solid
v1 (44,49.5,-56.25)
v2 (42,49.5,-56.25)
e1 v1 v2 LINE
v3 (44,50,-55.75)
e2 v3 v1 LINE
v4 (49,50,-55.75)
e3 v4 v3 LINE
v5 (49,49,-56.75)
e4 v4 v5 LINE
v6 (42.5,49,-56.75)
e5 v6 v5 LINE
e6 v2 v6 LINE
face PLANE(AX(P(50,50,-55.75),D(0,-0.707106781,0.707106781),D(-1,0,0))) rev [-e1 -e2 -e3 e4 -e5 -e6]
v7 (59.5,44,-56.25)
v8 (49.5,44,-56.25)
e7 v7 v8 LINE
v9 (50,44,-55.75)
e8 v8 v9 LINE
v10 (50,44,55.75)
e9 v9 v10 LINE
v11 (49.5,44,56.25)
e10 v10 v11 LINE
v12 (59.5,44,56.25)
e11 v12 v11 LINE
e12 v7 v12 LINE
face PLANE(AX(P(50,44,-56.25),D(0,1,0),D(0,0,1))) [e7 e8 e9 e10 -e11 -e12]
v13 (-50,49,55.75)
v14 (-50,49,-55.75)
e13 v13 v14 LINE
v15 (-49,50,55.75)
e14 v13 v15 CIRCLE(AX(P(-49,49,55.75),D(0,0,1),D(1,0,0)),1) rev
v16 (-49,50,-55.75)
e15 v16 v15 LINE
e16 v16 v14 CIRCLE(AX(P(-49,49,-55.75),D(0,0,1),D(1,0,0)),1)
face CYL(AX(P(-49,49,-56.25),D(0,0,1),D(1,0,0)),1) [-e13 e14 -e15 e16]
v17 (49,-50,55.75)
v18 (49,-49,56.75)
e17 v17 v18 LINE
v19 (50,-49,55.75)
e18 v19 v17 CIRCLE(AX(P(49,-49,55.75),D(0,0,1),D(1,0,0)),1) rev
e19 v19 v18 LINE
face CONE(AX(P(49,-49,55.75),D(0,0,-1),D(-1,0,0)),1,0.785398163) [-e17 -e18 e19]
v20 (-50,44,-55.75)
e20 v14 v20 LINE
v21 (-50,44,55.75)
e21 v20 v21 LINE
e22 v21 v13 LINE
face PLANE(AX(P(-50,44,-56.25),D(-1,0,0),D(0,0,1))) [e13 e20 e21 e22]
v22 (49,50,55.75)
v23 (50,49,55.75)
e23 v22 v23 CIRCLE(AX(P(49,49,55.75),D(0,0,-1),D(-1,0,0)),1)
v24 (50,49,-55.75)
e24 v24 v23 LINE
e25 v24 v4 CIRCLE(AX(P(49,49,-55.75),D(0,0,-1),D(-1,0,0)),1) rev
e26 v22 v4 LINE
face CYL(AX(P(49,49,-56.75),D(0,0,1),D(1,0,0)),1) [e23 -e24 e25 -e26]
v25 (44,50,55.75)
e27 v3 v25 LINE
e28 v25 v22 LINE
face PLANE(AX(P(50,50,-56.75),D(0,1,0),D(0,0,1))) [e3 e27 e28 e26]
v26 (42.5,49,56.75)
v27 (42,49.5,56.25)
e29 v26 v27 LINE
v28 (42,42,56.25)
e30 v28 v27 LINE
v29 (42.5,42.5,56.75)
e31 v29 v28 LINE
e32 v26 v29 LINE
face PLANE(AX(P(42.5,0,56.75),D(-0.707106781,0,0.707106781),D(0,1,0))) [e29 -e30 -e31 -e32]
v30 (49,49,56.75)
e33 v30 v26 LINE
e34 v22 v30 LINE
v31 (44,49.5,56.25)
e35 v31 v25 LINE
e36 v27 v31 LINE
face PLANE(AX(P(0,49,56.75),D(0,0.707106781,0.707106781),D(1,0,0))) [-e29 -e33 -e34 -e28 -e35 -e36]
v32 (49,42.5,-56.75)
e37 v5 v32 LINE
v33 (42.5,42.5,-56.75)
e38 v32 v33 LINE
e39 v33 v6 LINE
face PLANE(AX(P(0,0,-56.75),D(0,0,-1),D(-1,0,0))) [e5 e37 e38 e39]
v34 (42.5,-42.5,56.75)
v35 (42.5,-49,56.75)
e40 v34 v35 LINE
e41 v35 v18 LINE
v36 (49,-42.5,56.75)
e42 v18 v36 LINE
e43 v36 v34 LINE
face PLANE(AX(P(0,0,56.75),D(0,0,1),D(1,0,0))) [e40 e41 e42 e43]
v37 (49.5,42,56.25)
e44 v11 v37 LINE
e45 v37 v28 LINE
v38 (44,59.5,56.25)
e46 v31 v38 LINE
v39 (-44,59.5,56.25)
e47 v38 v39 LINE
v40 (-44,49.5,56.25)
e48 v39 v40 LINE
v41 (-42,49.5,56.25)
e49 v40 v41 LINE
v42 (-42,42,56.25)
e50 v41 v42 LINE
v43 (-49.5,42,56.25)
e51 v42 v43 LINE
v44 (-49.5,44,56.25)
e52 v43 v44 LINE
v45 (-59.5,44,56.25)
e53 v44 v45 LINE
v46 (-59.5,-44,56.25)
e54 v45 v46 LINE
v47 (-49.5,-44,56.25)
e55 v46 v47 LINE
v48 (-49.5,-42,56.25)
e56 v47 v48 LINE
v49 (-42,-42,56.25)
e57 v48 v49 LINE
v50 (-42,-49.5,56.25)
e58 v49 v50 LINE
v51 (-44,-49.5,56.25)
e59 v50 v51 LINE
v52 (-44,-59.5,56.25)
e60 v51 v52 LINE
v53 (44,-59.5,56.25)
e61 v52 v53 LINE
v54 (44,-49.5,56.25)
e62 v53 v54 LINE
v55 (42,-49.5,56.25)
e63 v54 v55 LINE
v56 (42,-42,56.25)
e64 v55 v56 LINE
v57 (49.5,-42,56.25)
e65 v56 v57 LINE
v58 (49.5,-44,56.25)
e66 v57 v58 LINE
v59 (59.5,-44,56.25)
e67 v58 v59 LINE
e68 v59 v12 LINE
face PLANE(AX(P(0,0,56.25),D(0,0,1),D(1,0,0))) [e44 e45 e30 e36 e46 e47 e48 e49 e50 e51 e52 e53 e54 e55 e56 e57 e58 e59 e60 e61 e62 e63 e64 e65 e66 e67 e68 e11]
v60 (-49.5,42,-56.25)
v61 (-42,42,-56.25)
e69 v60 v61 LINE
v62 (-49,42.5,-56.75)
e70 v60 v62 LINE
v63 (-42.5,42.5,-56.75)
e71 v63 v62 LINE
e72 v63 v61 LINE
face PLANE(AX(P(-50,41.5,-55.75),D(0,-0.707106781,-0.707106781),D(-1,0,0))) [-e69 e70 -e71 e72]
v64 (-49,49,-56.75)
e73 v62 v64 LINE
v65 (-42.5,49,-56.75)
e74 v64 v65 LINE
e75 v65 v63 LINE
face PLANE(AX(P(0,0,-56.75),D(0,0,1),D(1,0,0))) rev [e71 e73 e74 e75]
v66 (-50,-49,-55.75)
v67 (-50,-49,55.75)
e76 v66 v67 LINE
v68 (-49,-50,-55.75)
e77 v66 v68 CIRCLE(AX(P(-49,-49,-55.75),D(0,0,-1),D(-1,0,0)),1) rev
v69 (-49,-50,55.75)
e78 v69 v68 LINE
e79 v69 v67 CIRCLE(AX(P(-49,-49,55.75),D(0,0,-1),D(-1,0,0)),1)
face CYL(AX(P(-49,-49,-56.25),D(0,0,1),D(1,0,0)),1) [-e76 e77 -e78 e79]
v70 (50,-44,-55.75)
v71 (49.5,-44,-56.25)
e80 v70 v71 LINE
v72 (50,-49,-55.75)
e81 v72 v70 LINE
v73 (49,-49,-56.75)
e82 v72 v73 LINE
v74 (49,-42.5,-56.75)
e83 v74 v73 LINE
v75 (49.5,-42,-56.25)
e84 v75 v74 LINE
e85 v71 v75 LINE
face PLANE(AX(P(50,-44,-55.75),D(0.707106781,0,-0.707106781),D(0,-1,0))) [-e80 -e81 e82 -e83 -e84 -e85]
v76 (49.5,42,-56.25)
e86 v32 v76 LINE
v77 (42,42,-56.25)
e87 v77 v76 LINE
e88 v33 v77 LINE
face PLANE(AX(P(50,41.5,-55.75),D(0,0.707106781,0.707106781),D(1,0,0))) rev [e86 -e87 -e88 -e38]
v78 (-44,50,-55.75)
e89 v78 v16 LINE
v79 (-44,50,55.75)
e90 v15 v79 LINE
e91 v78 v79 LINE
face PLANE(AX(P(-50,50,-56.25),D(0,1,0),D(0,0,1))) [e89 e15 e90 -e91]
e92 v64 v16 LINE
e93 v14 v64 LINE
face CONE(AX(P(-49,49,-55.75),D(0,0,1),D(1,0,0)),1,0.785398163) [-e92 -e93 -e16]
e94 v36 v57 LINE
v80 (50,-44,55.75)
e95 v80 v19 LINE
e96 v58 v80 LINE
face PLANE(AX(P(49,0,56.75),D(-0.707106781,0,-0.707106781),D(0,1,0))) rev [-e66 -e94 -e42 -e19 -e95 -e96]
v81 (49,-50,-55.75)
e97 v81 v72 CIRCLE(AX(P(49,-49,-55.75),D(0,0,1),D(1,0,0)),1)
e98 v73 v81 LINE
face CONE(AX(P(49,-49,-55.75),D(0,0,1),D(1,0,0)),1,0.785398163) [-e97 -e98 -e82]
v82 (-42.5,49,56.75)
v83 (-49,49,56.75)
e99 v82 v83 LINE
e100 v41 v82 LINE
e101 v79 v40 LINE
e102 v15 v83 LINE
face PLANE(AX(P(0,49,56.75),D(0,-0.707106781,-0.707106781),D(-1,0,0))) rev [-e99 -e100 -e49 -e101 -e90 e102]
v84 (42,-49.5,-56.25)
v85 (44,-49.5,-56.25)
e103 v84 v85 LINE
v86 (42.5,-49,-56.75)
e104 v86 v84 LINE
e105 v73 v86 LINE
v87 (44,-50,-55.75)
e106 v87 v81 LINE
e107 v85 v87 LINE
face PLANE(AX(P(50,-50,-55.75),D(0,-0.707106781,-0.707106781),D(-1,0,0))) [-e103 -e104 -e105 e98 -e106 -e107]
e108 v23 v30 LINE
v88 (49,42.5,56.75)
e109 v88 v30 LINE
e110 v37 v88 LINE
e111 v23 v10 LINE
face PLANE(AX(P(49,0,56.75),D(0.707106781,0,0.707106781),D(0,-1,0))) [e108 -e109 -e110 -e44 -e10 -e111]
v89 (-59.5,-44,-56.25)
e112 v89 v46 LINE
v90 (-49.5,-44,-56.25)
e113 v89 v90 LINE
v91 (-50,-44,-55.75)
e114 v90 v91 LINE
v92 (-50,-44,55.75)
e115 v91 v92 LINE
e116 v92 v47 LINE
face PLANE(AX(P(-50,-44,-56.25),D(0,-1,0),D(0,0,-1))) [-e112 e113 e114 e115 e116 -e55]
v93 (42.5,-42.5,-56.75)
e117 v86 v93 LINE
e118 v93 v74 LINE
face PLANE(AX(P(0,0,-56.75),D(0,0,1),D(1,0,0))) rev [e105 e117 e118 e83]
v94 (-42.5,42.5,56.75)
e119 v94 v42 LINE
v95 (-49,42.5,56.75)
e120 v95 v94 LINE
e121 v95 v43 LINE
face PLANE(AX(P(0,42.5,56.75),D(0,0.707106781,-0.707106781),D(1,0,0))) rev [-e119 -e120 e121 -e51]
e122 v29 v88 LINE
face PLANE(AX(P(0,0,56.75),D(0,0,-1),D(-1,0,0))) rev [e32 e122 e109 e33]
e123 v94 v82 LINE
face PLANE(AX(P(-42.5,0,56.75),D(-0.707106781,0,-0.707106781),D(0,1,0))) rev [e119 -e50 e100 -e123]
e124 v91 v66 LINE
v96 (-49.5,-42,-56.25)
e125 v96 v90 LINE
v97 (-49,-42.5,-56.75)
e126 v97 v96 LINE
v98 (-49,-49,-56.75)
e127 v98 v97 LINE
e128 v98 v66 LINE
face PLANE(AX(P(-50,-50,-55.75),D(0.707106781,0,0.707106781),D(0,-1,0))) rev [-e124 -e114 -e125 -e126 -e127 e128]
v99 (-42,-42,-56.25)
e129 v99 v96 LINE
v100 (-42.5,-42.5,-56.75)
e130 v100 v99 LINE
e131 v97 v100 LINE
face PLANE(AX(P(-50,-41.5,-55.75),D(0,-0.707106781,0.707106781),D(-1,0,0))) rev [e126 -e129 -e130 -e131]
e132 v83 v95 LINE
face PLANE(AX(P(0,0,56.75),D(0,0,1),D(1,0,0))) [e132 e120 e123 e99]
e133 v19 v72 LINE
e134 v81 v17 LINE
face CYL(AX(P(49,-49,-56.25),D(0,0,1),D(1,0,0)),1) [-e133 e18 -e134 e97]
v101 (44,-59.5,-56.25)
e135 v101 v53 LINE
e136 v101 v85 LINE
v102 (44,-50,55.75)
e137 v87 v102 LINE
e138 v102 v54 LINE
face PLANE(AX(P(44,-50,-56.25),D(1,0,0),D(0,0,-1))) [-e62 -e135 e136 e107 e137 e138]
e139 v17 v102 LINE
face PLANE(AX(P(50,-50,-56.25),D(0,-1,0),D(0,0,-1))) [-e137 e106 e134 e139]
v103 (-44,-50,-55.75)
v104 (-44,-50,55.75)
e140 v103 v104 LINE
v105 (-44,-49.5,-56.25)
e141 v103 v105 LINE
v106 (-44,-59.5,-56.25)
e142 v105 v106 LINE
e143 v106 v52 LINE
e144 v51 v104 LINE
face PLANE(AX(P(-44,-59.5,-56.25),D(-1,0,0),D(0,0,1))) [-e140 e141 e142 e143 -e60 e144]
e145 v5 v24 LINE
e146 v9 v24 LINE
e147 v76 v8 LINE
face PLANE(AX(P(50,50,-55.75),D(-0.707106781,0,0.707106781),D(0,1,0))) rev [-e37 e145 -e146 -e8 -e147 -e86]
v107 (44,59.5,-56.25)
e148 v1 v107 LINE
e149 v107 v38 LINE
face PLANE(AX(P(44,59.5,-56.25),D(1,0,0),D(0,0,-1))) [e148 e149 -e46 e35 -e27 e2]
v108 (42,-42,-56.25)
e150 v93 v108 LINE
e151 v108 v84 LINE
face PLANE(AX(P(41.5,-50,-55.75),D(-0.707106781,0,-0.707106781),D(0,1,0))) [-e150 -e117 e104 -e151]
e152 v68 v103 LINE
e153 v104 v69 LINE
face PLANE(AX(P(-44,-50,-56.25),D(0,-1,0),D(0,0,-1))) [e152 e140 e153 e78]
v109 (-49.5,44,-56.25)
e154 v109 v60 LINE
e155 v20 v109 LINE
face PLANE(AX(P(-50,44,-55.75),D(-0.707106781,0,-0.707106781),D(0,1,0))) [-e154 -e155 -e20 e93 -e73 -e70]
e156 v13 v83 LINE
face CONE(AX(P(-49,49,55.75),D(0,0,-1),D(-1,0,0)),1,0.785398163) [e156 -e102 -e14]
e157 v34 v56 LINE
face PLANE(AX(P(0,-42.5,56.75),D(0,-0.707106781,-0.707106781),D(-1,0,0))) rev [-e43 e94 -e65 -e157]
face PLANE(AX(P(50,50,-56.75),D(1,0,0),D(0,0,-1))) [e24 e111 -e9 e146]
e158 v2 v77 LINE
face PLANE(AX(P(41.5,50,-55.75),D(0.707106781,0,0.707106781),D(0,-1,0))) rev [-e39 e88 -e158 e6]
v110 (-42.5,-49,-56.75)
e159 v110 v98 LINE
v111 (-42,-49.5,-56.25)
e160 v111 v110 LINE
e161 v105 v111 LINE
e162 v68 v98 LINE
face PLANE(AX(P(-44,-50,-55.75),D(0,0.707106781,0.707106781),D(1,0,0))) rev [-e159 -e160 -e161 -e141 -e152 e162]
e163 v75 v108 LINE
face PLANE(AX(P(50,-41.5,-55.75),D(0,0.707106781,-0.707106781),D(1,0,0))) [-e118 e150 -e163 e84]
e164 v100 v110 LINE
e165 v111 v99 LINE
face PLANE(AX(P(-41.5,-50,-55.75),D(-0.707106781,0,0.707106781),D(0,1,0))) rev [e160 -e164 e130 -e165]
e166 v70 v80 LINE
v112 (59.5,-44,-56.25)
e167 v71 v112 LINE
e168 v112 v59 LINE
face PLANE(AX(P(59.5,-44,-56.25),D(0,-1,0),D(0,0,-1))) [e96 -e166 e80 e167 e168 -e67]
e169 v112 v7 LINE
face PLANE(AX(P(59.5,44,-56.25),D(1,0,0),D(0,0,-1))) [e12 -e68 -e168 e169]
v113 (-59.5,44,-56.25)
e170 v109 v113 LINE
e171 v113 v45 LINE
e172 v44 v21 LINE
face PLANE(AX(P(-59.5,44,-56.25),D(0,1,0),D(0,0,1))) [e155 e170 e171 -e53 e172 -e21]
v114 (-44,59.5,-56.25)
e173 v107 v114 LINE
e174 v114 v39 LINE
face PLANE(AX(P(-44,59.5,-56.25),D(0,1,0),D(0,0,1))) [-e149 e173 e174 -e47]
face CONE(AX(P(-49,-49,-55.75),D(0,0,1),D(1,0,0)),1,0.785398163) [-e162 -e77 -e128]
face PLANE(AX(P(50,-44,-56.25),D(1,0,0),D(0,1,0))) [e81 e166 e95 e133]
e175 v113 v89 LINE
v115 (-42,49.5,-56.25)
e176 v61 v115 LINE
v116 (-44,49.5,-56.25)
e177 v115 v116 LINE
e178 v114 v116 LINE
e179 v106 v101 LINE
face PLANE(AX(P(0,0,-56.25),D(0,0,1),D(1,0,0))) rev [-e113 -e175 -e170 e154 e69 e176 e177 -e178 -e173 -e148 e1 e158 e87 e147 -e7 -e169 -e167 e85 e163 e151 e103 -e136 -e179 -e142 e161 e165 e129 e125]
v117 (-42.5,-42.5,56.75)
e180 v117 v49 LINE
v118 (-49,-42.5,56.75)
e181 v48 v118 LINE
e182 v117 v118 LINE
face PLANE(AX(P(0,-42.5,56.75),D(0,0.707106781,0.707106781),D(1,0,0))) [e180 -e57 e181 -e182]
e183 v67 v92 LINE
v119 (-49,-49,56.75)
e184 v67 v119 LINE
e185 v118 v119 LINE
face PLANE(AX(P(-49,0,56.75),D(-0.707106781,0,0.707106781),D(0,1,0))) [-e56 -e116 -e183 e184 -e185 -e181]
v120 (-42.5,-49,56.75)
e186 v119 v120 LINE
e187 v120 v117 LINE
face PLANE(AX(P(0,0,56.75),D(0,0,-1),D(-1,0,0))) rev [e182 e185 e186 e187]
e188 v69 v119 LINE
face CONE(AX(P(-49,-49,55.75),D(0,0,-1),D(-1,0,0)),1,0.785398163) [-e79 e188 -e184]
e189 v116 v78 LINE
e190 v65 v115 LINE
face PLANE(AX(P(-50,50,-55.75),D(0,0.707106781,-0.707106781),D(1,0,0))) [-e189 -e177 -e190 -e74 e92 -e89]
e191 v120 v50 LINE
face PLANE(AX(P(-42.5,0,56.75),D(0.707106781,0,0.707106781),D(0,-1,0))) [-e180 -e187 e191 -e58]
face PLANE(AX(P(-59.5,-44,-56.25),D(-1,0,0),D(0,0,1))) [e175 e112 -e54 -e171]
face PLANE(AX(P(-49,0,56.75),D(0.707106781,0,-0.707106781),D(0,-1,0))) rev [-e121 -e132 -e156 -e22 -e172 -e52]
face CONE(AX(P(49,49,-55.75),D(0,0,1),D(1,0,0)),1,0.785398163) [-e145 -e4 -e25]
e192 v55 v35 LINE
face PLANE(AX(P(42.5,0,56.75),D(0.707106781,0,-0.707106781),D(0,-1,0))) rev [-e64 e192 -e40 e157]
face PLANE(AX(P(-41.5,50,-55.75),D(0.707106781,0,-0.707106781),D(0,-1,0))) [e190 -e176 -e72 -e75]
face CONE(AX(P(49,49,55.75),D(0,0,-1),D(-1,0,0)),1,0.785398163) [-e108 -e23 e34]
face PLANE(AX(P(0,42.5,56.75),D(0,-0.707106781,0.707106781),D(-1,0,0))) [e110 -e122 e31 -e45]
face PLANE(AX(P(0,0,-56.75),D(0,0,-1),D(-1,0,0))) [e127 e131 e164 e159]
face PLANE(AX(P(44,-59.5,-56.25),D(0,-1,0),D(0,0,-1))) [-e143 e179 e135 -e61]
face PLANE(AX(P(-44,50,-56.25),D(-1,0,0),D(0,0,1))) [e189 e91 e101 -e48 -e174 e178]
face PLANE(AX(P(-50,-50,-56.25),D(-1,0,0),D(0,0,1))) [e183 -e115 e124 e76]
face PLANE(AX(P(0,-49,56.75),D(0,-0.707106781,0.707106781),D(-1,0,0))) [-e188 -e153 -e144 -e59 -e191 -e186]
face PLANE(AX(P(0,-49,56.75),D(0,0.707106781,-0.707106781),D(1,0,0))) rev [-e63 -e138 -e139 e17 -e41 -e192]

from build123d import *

# Parameters (mm, degrees)
BOSS_EXTRUDE1_DEPTH        = 56.75
BOSS_EXTRUDE1_DEPTH_BACK   = 56.75
SKETCH1_W                  = 8.5
SKETCH1_H                  = 8.5
BOSS_EXTRUDE1_2_DEPTH      = 56.75
BOSS_EXTRUDE1_2_DEPTH_BACK = 56.75
BOSS_EXTRUDE1_3_DEPTH      = 56.75
BOSS_EXTRUDE1_3_DEPTH_BACK = 56.75
BOSS_EXTRUDE1_4_DEPTH      = 56.75
BOSS_EXTRUDE1_4_DEPTH_BACK = 56.75
BOSS_EXTRUDE2_DEPTH        = 56.25
BOSS_EXTRUDE2_DEPTH_BACK   = 56.25
FILLET1_R                  = 1
CHAMFER2_SIZE              = 1


with BuildPart() as part:
    # Sketch1 → Boss-Extrude1 (new, two sides: drawn at the far end of the back side and taken through both)
    with BuildSketch(Plane.XY.offset(-BOSS_EXTRUDE1_DEPTH_BACK)):
        with Locations((-45.75, 45.75)):
            Rectangle(SKETCH1_W, SKETCH1_H)
    extrude(amount=BOSS_EXTRUDE1_DEPTH + BOSS_EXTRUDE1_DEPTH_BACK)



with BuildPart() as body_2:
    # Sketch1 → Boss-Extrude1 2 (new, two sides: drawn at the far end of the back side and taken through both)
    with BuildSketch(Plane.XY.offset(-BOSS_EXTRUDE1_2_DEPTH_BACK)):
        with Locations((45.75, 45.75)):
            Rectangle(SKETCH1_W, SKETCH1_H)
    extrude(amount=BOSS_EXTRUDE1_2_DEPTH + BOSS_EXTRUDE1_2_DEPTH_BACK)


with BuildPart() as body_3:
    # Sketch1 → Boss-Extrude1 3 (new, two sides: drawn at the far end of the back side and taken through both)
    with BuildSketch(Plane.XY.offset(-BOSS_EXTRUDE1_3_DEPTH_BACK)):
        with Locations((45.75, -45.75)):
            Rectangle(SKETCH1_W, SKETCH1_H)
    extrude(amount=BOSS_EXTRUDE1_3_DEPTH + BOSS_EXTRUDE1_3_DEPTH_BACK)


with BuildPart() as body_4:
    # Sketch1 → Boss-Extrude1 4 (new, two sides: drawn at the far end of the back side and taken through both)
    with BuildSketch(Plane.XY.offset(-BOSS_EXTRUDE1_4_DEPTH_BACK)):
        with Locations((-45.75, -45.75)):
            Rectangle(SKETCH1_W, SKETCH1_H)
    extrude(amount=BOSS_EXTRUDE1_4_DEPTH + BOSS_EXTRUDE1_4_DEPTH_BACK)


with BuildPart() as part_1:
    add(part.part)

    add(body_2.part)  # Boss-Extrude2 merges body 2

    add(body_3.part)  # Boss-Extrude2 merges body 3

    add(body_4.part)  # Boss-Extrude2 merges body 4
    # Sketch2 → Boss-Extrude2 (add, two sides: drawn at the far end of the back side and taken through both)
    with BuildSketch(Plane.XY.offset(-BOSS_EXTRUDE2_DEPTH_BACK)):
        Polygon((-44, 50), (-44, 59.5), (44, 59.5), (44, 50), (50, 50), (50, 44), (59.5, 44), (59.5, -44), (50, -44), (50, -50), (44, -50), (44, -59.5), (-44, -59.5), (-44, -50), (-50, -50), (-50, -44), (-59.5, -44), (-59.5, 44), (-50, 44), (-50, 50), align=None)
    extrude(amount=BOSS_EXTRUDE2_DEPTH + BOSS_EXTRUDE2_DEPTH_BACK)

    # Fillet1
    fillet1_edges = [part_1.edges().sort_by_distance(p)[0] for p in [
        (50, -50, 0),
        (-50, -50, 0),
        (-50, 50, 0),
        (50, 50, 0),
    ]]
    fillet(fillet1_edges, radius=FILLET1_R)

    # Chamfer2
    chamfer2_edges = [part_1.edges().sort_by_distance(p)[0] for p in [
        (45.25, -50, 56.75),
        (50, -45.25, 56.75),
        (49.707106781, -49.707106781, 56.75),
    ]]
    chamfer(chamfer2_edges, length=CHAMFER2_SIZE)
    chamfer2_2_edges = [part_1.edges().sort_by_distance(p)[0] for p in [
        (45.25, -50, -56.75),
        (50, -45.25, -56.75),
        (49.707106781, -49.707106781, -56.75),
    ]]
    chamfer(chamfer2_2_edges, length=CHAMFER2_SIZE)
    chamfer2_3_edges = [part_1.edges().sort_by_distance(p)[0] for p in [
        (50, 45.25, 56.75),
        (45.25, 50, 56.75),
        (49.707106781, 49.707106781, 56.75),
    ]]
    chamfer(chamfer2_3_edges, length=CHAMFER2_SIZE)
    chamfer2_4_edges = [part_1.edges().sort_by_distance(p)[0] for p in [
        (50, 45.25, -56.75),
        (45.25, 50, -56.75),
        (49.707106781, 49.707106781, -56.75),
    ]]
    chamfer(chamfer2_4_edges, length=CHAMFER2_SIZE)
    chamfer2_5_edges = [part_1.edges().sort_by_distance(p)[0] for p in [
        (-45.25, 50, 56.75),
        (-49.707106781, 49.707106781, 56.75),
        (-50, 45.25, 56.75),
    ]]
    chamfer(chamfer2_5_edges, length=CHAMFER2_SIZE)
    chamfer2_6_edges = [part_1.edges().sort_by_distance(p)[0] for p in [
        (-45.25, 50, -56.75),
        (-49.707106781, 49.707106781, -56.75),
        (-50, 45.25, -56.75),
    ]]
    chamfer(chamfer2_6_edges, length=CHAMFER2_SIZE)
    chamfer2_7_edges = [part_1.edges().sort_by_distance(p)[0] for p in [
        (-50, -45.25, 56.75),
        (-45.25, -50, 56.75),
        (-49.707106781, -49.707106781, 56.75),
    ]]
    chamfer(chamfer2_7_edges, length=CHAMFER2_SIZE)
    chamfer2_8_edges = [part_1.edges().sort_by_distance(p)[0] for p in [
        (-50, -45.25, -56.75),
        (-45.25, -50, -56.75),
        (-49.707106781, -49.707106781, -56.75),
    ]]
    chamfer(chamfer2_8_edges, length=CHAMFER2_SIZE)
    # the kernel refuses this chamfer: 1 mm, written as the material it takes off along each edge
    with BuildSketch(Plane(origin=(41.5, -51.571682988, 56.75), x_dir=(-0.027495876610589005, 0, -0.9996219169112968), z_dir=(0, 1, 0))) as chamfer2_9_piece_1_section:
        with BuildLine():
            Line((1.028673195, 0), (-0.056547155, -1.027117794))
            Line((-0.056547155, -1.027117794), (-0.076539593, -1.026567876))
            ThreePointArc((-0.076539593, -1.026567876), (-0.034129227, -0.51339783), (-0.019992438, 0.000549918))
            Line((-0.019992438, 0.000549918), (0.000549918, 0.019992438))
            ThreePointArc((0.000549918, 0.019992438), (0.514497665, 0.00585565), (1.029223113, 0.019992438))
            Line((1.029223113, 0.019992438), (1.028673195, 0))
        make_face()
    chamfer2_9_piece_1 = extrude(amount=12.643365976, mode=Mode.PRIVATE)
    chamfer2_9_piece_1 = split(chamfer2_9_piece_1, bisect_by=Plane(origin=(41.893401084, -45.25, 56.25), z_dir=(0, 0, 1)), keep=Keep.TOP, mode=Mode.PRIVATE)
    add(chamfer2_9_piece_1, mode=Mode.SUBTRACT)
    # the kernel refuses this chamfer: 1 mm, written as the material it takes off along each edge
    with BuildSketch(Plane(origin=(41.5, -51.571682988, -56.75), x_dir=(-0.027495876610589005, 0, 0.9996219169112968), z_dir=(0, 1, 0))) as chamfer2_10_piece_1_section:
        with BuildLine():
            Line((1.028673195, 0), (-0.056547155, 1.027117794))
            Line((-0.056547155, 1.027117794), (-0.076539593, 1.026567876))
            ThreePointArc((-0.076539593, 1.026567876), (-0.034129227, 0.51339783), (-0.019992438, -0.000549918))
            Line((-0.019992438, -0.000549918), (0.000549918, -0.019992438))
            ThreePointArc((0.000549918, -0.019992438), (0.514497665, -0.00585565), (1.029223113, -0.019992438))
            Line((1.029223113, -0.019992438), (1.028673195, 0))
        make_face()
    chamfer2_10_piece_1 = extrude(amount=12.643365976, mode=Mode.PRIVATE)
    chamfer2_10_piece_1 = split(chamfer2_10_piece_1, bisect_by=Plane(origin=(41.893401084, -45.25, -56.25), z_dir=(0, 0, -1)), keep=Keep.TOP, mode=Mode.PRIVATE)
    add(chamfer2_10_piece_1, mode=Mode.SUBTRACT)
    # the kernel refuses this chamfer: 1 mm, written as the material it takes off along each edge
    with BuildSketch(Plane(origin=(39.928317012, -41.5, 56.75), x_dir=(0, 0.027495876610589005, -0.9996219169112968), z_dir=(1, 0, 0))) as chamfer2_11_piece_1_section:
        with BuildLine():
            Line((1.028673195, 0), (-0.056547155, -1.027117794))
            Line((-0.056547155, -1.027117794), (-0.076539593, -1.026567876))
            ThreePointArc((-0.076539593, -1.026567876), (-0.034129227, -0.51339783), (-0.019992438, 0.000549918))
            Line((-0.019992438, 0.000549918), (0.000549918, 0.019992438))
            ThreePointArc((0.000549918, 0.019992438), (0.514497665, 0.00585565), (1.029223113, 0.019992438))
            Line((1.029223113, 0.019992438), (1.028673195, 0))
        make_face()
    chamfer2_11_piece_1 = extrude(amount=11.643365976, mode=Mode.PRIVATE)
    chamfer2_11_piece_1 = split(chamfer2_11_piece_1, bisect_by=Plane(origin=(45.75, -41.893401084, 56.25), z_dir=(0, 0, 1)), keep=Keep.TOP, mode=Mode.PRIVATE)
    add(chamfer2_11_piece_1, mode=Mode.SUBTRACT)
    # the kernel refuses this chamfer: 1 mm, written as the material it takes off along each edge
    with BuildSketch(Plane(origin=(39.928317012, -41.5, -56.75), x_dir=(0, 0.027495876610589005, 0.9996219169112968), z_dir=(1, 0, 0))) as chamfer2_12_piece_1_section:
        with BuildLine():
            Line((1.028673195, 0), (-0.056547155, 1.027117794))
            Line((-0.056547155, 1.027117794), (-0.076539593, 1.026567876))
            ThreePointArc((-0.076539593, 1.026567876), (-0.034129227, 0.51339783), (-0.019992438, -0.000549918))
            Line((-0.019992438, -0.000549918), (0.000549918, -0.019992438))
            ThreePointArc((0.000549918, -0.019992438), (0.514497665, -0.00585565), (1.029223113, -0.019992438))
            Line((1.029223113, -0.019992438), (1.028673195, 0))
        make_face()
    chamfer2_12_piece_1 = extrude(amount=11.643365976, mode=Mode.PRIVATE)
    chamfer2_12_piece_1 = split(chamfer2_12_piece_1, bisect_by=Plane(origin=(45.75, -41.893401084, -56.25), z_dir=(0, 0, -1)), keep=Keep.TOP, mode=Mode.PRIVATE)
    add(chamfer2_12_piece_1, mode=Mode.SUBTRACT)
    # the kernel refuses this chamfer: 1 mm, written as the material it takes off along each edge
    with BuildSketch(Plane(origin=(38.928317012, 41.5, 56.75), x_dir=(0, -0.027495876610589005, -0.9996219169112968), z_dir=(1, 0, 0))) as chamfer2_13_piece_1_section:
        with BuildLine():
            Line((1.028673195, 0), (-0.056547155, 1.027117794))
            Line((-0.056547155, 1.027117794), (-0.076539593, 1.026567876))
            ThreePointArc((-0.076539593, 1.026567876), (-0.034129227, 0.51339783), (-0.019992438, -0.000549918))
            Line((-0.019992438, -0.000549918), (0.000549918, -0.019992438))
            ThreePointArc((0.000549918, -0.019992438), (0.514497665, -0.00585565), (1.029223113, -0.019992438))
            Line((1.029223113, -0.019992438), (1.028673195, 0))
        make_face()
    chamfer2_13_piece_1 = extrude(amount=12.643365976, mode=Mode.PRIVATE)
    chamfer2_13_piece_1 = split(chamfer2_13_piece_1, bisect_by=Plane(origin=(45.25, 41.893401084, 56.25), z_dir=(0, 0, 1)), keep=Keep.TOP, mode=Mode.PRIVATE)
    add(chamfer2_13_piece_1, mode=Mode.SUBTRACT)
    # the kernel refuses this chamfer: 1 mm, written as the material it takes off along each edge
    with BuildSketch(Plane(origin=(41.5, 51.571682988, 56.75), x_dir=(-0.027495876610589005, 0, -0.9996219169112968), z_dir=(0, -1, 0))) as chamfer2_14_piece_1_section:
        with BuildLine():
            Line((1.028673195, 0), (-0.056547155, 1.027117794))
            Line((-0.056547155, 1.027117794), (-0.076539593, 1.026567876))
            ThreePointArc((-0.076539593, 1.026567876), (-0.034129227, 0.51339783), (-0.019992438, -0.000549918))
            Line((-0.019992438, -0.000549918), (0.000549918, -0.019992438))
            ThreePointArc((0.000549918, -0.019992438), (0.514497665, -0.00585565), (1.029223113, -0.019992438))
            Line((1.029223113, -0.019992438), (1.028673195, 0))
        make_face()
    chamfer2_14_piece_1 = extrude(amount=11.643365976, mode=Mode.PRIVATE)
    chamfer2_14_piece_1 = split(chamfer2_14_piece_1, bisect_by=Plane(origin=(41.893401084, 45.75, 56.25), z_dir=(0, 0, 1)), keep=Keep.TOP, mode=Mode.PRIVATE)
    add(chamfer2_14_piece_1, mode=Mode.SUBTRACT)
    # the kernel refuses this chamfer: 1 mm, written as the material it takes off along each edge
    with BuildSketch(Plane(origin=(38.928317012, 41.5, -56.75), x_dir=(0, -0.027495876610589005, 0.9996219169112968), z_dir=(1, 0, 0))) as chamfer2_15_piece_1_section:
        with BuildLine():
            Line((1.028673195, 0), (-0.056547155, -1.027117794))
            Line((-0.056547155, -1.027117794), (-0.076539593, -1.026567876))
            ThreePointArc((-0.076539593, -1.026567876), (-0.034129227, -0.51339783), (-0.019992438, 0.000549918))
            Line((-0.019992438, 0.000549918), (0.000549918, 0.019992438))
            ThreePointArc((0.000549918, 0.019992438), (0.514497665, 0.00585565), (1.029223113, 0.019992438))
            Line((1.029223113, 0.019992438), (1.028673195, 0))
        make_face()
    chamfer2_15_piece_1 = extrude(amount=12.643365976, mode=Mode.PRIVATE)
    chamfer2_15_piece_1 = split(chamfer2_15_piece_1, bisect_by=Plane(origin=(45.25, 41.893401084, -56.25), z_dir=(0, 0, -1)), keep=Keep.TOP, mode=Mode.PRIVATE)
    add(chamfer2_15_piece_1, mode=Mode.SUBTRACT)
    # the kernel refuses this chamfer: 1 mm, written as the material it takes off along each edge
    with BuildSketch(Plane(origin=(41.5, 51.571682988, -56.75), x_dir=(-0.027495876610589005, 0, 0.9996219169112968), z_dir=(0, -1, 0))) as chamfer2_16_piece_1_section:
        with BuildLine():
            Line((1.028673195, 0), (-0.056547155, -1.027117794))
            Line((-0.056547155, -1.027117794), (-0.076539593, -1.026567876))
            ThreePointArc((-0.076539593, -1.026567876), (-0.034129227, -0.51339783), (-0.019992438, 0.000549918))
            Line((-0.019992438, 0.000549918), (0.000549918, 0.019992438))
            ThreePointArc((0.000549918, 0.019992438), (0.514497665, 0.00585565), (1.029223113, 0.019992438))
            Line((1.029223113, 0.019992438), (1.028673195, 0))
        make_face()
    chamfer2_16_piece_1 = extrude(amount=11.643365976, mode=Mode.PRIVATE)
    chamfer2_16_piece_1 = split(chamfer2_16_piece_1, bisect_by=Plane(origin=(41.893401084, 45.75, -56.25), z_dir=(0, 0, -1)), keep=Keep.TOP, mode=Mode.PRIVATE)
    add(chamfer2_16_piece_1, mode=Mode.SUBTRACT)
    # the kernel refuses this chamfer: 1 mm, written as the material it takes off along each edge
    with BuildSketch(Plane(origin=(-41.5, 51.571682988, 56.75), x_dir=(0.027495876610589005, 0, -0.9996219169112968), z_dir=(0, -1, 0))) as chamfer2_17_piece_1_section:
        with BuildLine():
            Line((1.028673195, 0), (-0.056547155, -1.027117794))
            Line((-0.056547155, -1.027117794), (-0.076539593, -1.026567876))
            ThreePointArc((-0.076539593, -1.026567876), (-0.034129227, -0.51339783), (-0.019992438, 0.000549918))
            Line((-0.019992438, 0.000549918), (0.000549918, 0.019992438))
            ThreePointArc((0.000549918, 0.019992438), (0.514497665, 0.00585565), (1.029223113, 0.019992438))
            Line((1.029223113, 0.019992438), (1.028673195, 0))
        make_face()
    chamfer2_17_piece_1 = extrude(amount=12.643365976, mode=Mode.PRIVATE)
    chamfer2_17_piece_1 = split(chamfer2_17_piece_1, bisect_by=Plane(origin=(-41.893401084, 45.25, 56.25), z_dir=(0, 0, 1)), keep=Keep.TOP, mode=Mode.PRIVATE)
    add(chamfer2_17_piece_1, mode=Mode.SUBTRACT)
    # the kernel refuses this chamfer: 1 mm, written as the material it takes off along each edge
    with BuildSketch(Plane(origin=(-39.928317012, 41.5, 56.75), x_dir=(0, -0.027495876610589005, -0.9996219169112968), z_dir=(-1, 0, 0))) as chamfer2_18_piece_1_section:
        with BuildLine():
            Line((1.028673195, 0), (-0.056547155, -1.027117794))
            Line((-0.056547155, -1.027117794), (-0.076539593, -1.026567876))
            ThreePointArc((-0.076539593, -1.026567876), (-0.034129227, -0.51339783), (-0.019992438, 0.000549918))
            Line((-0.019992438, 0.000549918), (0.000549918, 0.019992438))
            ThreePointArc((0.000549918, 0.019992438), (0.514497665, 0.00585565), (1.029223113, 0.019992438))
            Line((1.029223113, 0.019992438), (1.028673195, 0))
        make_face()
    chamfer2_18_piece_1 = extrude(amount=11.643365976, mode=Mode.PRIVATE)
    chamfer2_18_piece_1 = split(chamfer2_18_piece_1, bisect_by=Plane(origin=(-45.75, 41.893401084, 56.25), z_dir=(0, 0, 1)), keep=Keep.TOP, mode=Mode.PRIVATE)
    add(chamfer2_18_piece_1, mode=Mode.SUBTRACT)
    # the kernel refuses this chamfer: 1 mm, written as the material it takes off along each edge
    with BuildSketch(Plane(origin=(-41.5, 51.571682988, -56.75), x_dir=(0.027495876610589005, 0, 0.9996219169112968), z_dir=(0, -1, 0))) as chamfer2_19_piece_1_section:
        with BuildLine():
            Line((1.028673195, 0), (-0.056547155, 1.027117794))
            Line((-0.056547155, 1.027117794), (-0.076539593, 1.026567876))
            ThreePointArc((-0.076539593, 1.026567876), (-0.034129227, 0.51339783), (-0.019992438, -0.000549918))
            Line((-0.019992438, -0.000549918), (0.000549918, -0.019992438))
            ThreePointArc((0.000549918, -0.019992438), (0.514497665, -0.00585565), (1.029223113, -0.019992438))
            Line((1.029223113, -0.019992438), (1.028673195, 0))
        make_face()
    chamfer2_19_piece_1 = extrude(amount=12.643365976, mode=Mode.PRIVATE)
    chamfer2_19_piece_1 = split(chamfer2_19_piece_1, bisect_by=Plane(origin=(-41.893401084, 45.25, -56.25), z_dir=(0, 0, -1)), keep=Keep.TOP, mode=Mode.PRIVATE)
    add(chamfer2_19_piece_1, mode=Mode.SUBTRACT)
    # the kernel refuses this chamfer: 1 mm, written as the material it takes off along each edge
    with BuildSketch(Plane(origin=(-39.928317012, 41.5, -56.75), x_dir=(0, -0.027495876610589005, 0.9996219169112968), z_dir=(-1, 0, 0))) as chamfer2_20_piece_1_section:
        with BuildLine():
            Line((1.028673195, 0), (-0.056547155, 1.027117794))
            Line((-0.056547155, 1.027117794), (-0.076539593, 1.026567876))
            ThreePointArc((-0.076539593, 1.026567876), (-0.034129227, 0.51339783), (-0.019992438, -0.000549918))
            Line((-0.019992438, -0.000549918), (0.000549918, -0.019992438))
            ThreePointArc((0.000549918, -0.019992438), (0.514497665, -0.00585565), (1.029223113, -0.019992438))
            Line((1.029223113, -0.019992438), (1.028673195, 0))
        make_face()
    chamfer2_20_piece_1 = extrude(amount=11.643365976, mode=Mode.PRIVATE)
    chamfer2_20_piece_1 = split(chamfer2_20_piece_1, bisect_by=Plane(origin=(-45.75, 41.893401084, -56.25), z_dir=(0, 0, -1)), keep=Keep.TOP, mode=Mode.PRIVATE)
    add(chamfer2_20_piece_1, mode=Mode.SUBTRACT)
    # the kernel refuses this chamfer: 1 mm, written as the material it takes off along each edge
    with BuildSketch(Plane(origin=(-38.928317012, -41.5, 56.75), x_dir=(0, 0.027495876610589005, -0.9996219169112968), z_dir=(-1, 0, 0))) as chamfer2_21_piece_1_section:
        with BuildLine():
            Line((1.028673195, 0), (-0.056547155, 1.027117794))
            Line((-0.056547155, 1.027117794), (-0.076539593, 1.026567876))
            ThreePointArc((-0.076539593, 1.026567876), (-0.034129227, 0.51339783), (-0.019992438, -0.000549918))
            Line((-0.019992438, -0.000549918), (0.000549918, -0.019992438))
            ThreePointArc((0.000549918, -0.019992438), (0.514497665, -0.00585565), (1.029223113, -0.019992438))
            Line((1.029223113, -0.019992438), (1.028673195, 0))
        make_face()
    chamfer2_21_piece_1 = extrude(amount=12.643365976, mode=Mode.PRIVATE)
    chamfer2_21_piece_1 = split(chamfer2_21_piece_1, bisect_by=Plane(origin=(-45.25, -41.893401084, 56.25), z_dir=(0, 0, 1)), keep=Keep.TOP, mode=Mode.PRIVATE)
    add(chamfer2_21_piece_1, mode=Mode.SUBTRACT)
    # the kernel refuses this chamfer: 1 mm, written as the material it takes off along each edge
    with BuildSketch(Plane(origin=(-41.5, -51.571682988, 56.75), x_dir=(-0.9996219169112968, 0, 0.027495876610589005), z_dir=(0, 1, 0))) as chamfer2_22_piece_1_section:
        with BuildLine():
            Line((1.028673195, 0), (-0.056547155, -1.027117794))
            Line((-0.056547155, -1.027117794), (-0.076539593, -1.026567876))
            ThreePointArc((-0.076539593, -1.026567876), (-0.034129227, -0.51339783), (-0.019992438, 0.000549918))
            Line((-0.019992438, 0.000549918), (0.000549918, 0.019992438))
            ThreePointArc((0.000549918, 0.019992438), (0.514497665, 0.00585565), (1.029223113, 0.019992438))
            Line((1.029223113, 0.019992438), (1.028673195, 0))
        make_face()
    chamfer2_22_piece_1 = extrude(amount=11.643365976, mode=Mode.PRIVATE)
    chamfer2_22_piece_1 = split(chamfer2_22_piece_1, bisect_by=Plane(origin=(-41.893401084, -45.75, 56.25), z_dir=(0, 0, 1)), keep=Keep.TOP, mode=Mode.PRIVATE)
    add(chamfer2_22_piece_1, mode=Mode.SUBTRACT)
    # the kernel refuses this chamfer: 1 mm, written as the material it takes off along each edge
    with BuildSketch(Plane(origin=(-38.928317012, -41.5, -56.75), x_dir=(0, 0.027495876610589005, 0.9996219169112968), z_dir=(-1, 0, 0))) as chamfer2_23_piece_1_section:
        with BuildLine():
            Line((1.028673195, 0), (-0.056547155, -1.027117794))
            Line((-0.056547155, -1.027117794), (-0.076539593, -1.026567876))
            ThreePointArc((-0.076539593, -1.026567876), (-0.034129227, -0.51339783), (-0.019992438, 0.000549918))
            Line((-0.019992438, 0.000549918), (0.000549918, 0.019992438))
            ThreePointArc((0.000549918, 0.019992438), (0.514497665, 0.00585565), (1.029223113, 0.019992438))
            Line((1.029223113, 0.019992438), (1.028673195, 0))
        make_face()
    chamfer2_23_piece_1 = extrude(amount=12.643365976, mode=Mode.PRIVATE)
    chamfer2_23_piece_1 = split(chamfer2_23_piece_1, bisect_by=Plane(origin=(-45.25, -41.893401084, -56.25), z_dir=(0, 0, -1)), keep=Keep.TOP, mode=Mode.PRIVATE)
    add(chamfer2_23_piece_1, mode=Mode.SUBTRACT)
    # the kernel refuses this chamfer: 1 mm, written as the material it takes off along each edge
    with BuildSketch(Plane(origin=(-41.5, -51.571682988, -56.75), x_dir=(-0.9996219169112968, 0, -0.027495876610589005), z_dir=(0, 1, 0))) as chamfer2_24_piece_1_section:
        with BuildLine():
            Line((1.028673195, 0), (-0.056547155, 1.027117794))
            Line((-0.056547155, 1.027117794), (-0.076539593, 1.026567876))
            ThreePointArc((-0.076539593, 1.026567876), (-0.034129227, 0.51339783), (-0.019992438, -0.000549918))
            Line((-0.019992438, -0.000549918), (0.000549918, -0.019992438))
            ThreePointArc((0.000549918, -0.019992438), (0.514497665, -0.00585565), (1.029223113, -0.019992438))
            Line((1.029223113, -0.019992438), (1.028673195, 0))
        make_face()
    chamfer2_24_piece_1 = extrude(amount=11.643365976, mode=Mode.PRIVATE)
    chamfer2_24_piece_1 = split(chamfer2_24_piece_1, bisect_by=Plane(origin=(-41.893401084, -45.75, -56.25), z_dir=(0, 0, -1)), keep=Keep.TOP, mode=Mode.PRIVATE)
    add(chamfer2_24_piece_1, mode=Mode.SUBTRACT)


solid = part_1.part
